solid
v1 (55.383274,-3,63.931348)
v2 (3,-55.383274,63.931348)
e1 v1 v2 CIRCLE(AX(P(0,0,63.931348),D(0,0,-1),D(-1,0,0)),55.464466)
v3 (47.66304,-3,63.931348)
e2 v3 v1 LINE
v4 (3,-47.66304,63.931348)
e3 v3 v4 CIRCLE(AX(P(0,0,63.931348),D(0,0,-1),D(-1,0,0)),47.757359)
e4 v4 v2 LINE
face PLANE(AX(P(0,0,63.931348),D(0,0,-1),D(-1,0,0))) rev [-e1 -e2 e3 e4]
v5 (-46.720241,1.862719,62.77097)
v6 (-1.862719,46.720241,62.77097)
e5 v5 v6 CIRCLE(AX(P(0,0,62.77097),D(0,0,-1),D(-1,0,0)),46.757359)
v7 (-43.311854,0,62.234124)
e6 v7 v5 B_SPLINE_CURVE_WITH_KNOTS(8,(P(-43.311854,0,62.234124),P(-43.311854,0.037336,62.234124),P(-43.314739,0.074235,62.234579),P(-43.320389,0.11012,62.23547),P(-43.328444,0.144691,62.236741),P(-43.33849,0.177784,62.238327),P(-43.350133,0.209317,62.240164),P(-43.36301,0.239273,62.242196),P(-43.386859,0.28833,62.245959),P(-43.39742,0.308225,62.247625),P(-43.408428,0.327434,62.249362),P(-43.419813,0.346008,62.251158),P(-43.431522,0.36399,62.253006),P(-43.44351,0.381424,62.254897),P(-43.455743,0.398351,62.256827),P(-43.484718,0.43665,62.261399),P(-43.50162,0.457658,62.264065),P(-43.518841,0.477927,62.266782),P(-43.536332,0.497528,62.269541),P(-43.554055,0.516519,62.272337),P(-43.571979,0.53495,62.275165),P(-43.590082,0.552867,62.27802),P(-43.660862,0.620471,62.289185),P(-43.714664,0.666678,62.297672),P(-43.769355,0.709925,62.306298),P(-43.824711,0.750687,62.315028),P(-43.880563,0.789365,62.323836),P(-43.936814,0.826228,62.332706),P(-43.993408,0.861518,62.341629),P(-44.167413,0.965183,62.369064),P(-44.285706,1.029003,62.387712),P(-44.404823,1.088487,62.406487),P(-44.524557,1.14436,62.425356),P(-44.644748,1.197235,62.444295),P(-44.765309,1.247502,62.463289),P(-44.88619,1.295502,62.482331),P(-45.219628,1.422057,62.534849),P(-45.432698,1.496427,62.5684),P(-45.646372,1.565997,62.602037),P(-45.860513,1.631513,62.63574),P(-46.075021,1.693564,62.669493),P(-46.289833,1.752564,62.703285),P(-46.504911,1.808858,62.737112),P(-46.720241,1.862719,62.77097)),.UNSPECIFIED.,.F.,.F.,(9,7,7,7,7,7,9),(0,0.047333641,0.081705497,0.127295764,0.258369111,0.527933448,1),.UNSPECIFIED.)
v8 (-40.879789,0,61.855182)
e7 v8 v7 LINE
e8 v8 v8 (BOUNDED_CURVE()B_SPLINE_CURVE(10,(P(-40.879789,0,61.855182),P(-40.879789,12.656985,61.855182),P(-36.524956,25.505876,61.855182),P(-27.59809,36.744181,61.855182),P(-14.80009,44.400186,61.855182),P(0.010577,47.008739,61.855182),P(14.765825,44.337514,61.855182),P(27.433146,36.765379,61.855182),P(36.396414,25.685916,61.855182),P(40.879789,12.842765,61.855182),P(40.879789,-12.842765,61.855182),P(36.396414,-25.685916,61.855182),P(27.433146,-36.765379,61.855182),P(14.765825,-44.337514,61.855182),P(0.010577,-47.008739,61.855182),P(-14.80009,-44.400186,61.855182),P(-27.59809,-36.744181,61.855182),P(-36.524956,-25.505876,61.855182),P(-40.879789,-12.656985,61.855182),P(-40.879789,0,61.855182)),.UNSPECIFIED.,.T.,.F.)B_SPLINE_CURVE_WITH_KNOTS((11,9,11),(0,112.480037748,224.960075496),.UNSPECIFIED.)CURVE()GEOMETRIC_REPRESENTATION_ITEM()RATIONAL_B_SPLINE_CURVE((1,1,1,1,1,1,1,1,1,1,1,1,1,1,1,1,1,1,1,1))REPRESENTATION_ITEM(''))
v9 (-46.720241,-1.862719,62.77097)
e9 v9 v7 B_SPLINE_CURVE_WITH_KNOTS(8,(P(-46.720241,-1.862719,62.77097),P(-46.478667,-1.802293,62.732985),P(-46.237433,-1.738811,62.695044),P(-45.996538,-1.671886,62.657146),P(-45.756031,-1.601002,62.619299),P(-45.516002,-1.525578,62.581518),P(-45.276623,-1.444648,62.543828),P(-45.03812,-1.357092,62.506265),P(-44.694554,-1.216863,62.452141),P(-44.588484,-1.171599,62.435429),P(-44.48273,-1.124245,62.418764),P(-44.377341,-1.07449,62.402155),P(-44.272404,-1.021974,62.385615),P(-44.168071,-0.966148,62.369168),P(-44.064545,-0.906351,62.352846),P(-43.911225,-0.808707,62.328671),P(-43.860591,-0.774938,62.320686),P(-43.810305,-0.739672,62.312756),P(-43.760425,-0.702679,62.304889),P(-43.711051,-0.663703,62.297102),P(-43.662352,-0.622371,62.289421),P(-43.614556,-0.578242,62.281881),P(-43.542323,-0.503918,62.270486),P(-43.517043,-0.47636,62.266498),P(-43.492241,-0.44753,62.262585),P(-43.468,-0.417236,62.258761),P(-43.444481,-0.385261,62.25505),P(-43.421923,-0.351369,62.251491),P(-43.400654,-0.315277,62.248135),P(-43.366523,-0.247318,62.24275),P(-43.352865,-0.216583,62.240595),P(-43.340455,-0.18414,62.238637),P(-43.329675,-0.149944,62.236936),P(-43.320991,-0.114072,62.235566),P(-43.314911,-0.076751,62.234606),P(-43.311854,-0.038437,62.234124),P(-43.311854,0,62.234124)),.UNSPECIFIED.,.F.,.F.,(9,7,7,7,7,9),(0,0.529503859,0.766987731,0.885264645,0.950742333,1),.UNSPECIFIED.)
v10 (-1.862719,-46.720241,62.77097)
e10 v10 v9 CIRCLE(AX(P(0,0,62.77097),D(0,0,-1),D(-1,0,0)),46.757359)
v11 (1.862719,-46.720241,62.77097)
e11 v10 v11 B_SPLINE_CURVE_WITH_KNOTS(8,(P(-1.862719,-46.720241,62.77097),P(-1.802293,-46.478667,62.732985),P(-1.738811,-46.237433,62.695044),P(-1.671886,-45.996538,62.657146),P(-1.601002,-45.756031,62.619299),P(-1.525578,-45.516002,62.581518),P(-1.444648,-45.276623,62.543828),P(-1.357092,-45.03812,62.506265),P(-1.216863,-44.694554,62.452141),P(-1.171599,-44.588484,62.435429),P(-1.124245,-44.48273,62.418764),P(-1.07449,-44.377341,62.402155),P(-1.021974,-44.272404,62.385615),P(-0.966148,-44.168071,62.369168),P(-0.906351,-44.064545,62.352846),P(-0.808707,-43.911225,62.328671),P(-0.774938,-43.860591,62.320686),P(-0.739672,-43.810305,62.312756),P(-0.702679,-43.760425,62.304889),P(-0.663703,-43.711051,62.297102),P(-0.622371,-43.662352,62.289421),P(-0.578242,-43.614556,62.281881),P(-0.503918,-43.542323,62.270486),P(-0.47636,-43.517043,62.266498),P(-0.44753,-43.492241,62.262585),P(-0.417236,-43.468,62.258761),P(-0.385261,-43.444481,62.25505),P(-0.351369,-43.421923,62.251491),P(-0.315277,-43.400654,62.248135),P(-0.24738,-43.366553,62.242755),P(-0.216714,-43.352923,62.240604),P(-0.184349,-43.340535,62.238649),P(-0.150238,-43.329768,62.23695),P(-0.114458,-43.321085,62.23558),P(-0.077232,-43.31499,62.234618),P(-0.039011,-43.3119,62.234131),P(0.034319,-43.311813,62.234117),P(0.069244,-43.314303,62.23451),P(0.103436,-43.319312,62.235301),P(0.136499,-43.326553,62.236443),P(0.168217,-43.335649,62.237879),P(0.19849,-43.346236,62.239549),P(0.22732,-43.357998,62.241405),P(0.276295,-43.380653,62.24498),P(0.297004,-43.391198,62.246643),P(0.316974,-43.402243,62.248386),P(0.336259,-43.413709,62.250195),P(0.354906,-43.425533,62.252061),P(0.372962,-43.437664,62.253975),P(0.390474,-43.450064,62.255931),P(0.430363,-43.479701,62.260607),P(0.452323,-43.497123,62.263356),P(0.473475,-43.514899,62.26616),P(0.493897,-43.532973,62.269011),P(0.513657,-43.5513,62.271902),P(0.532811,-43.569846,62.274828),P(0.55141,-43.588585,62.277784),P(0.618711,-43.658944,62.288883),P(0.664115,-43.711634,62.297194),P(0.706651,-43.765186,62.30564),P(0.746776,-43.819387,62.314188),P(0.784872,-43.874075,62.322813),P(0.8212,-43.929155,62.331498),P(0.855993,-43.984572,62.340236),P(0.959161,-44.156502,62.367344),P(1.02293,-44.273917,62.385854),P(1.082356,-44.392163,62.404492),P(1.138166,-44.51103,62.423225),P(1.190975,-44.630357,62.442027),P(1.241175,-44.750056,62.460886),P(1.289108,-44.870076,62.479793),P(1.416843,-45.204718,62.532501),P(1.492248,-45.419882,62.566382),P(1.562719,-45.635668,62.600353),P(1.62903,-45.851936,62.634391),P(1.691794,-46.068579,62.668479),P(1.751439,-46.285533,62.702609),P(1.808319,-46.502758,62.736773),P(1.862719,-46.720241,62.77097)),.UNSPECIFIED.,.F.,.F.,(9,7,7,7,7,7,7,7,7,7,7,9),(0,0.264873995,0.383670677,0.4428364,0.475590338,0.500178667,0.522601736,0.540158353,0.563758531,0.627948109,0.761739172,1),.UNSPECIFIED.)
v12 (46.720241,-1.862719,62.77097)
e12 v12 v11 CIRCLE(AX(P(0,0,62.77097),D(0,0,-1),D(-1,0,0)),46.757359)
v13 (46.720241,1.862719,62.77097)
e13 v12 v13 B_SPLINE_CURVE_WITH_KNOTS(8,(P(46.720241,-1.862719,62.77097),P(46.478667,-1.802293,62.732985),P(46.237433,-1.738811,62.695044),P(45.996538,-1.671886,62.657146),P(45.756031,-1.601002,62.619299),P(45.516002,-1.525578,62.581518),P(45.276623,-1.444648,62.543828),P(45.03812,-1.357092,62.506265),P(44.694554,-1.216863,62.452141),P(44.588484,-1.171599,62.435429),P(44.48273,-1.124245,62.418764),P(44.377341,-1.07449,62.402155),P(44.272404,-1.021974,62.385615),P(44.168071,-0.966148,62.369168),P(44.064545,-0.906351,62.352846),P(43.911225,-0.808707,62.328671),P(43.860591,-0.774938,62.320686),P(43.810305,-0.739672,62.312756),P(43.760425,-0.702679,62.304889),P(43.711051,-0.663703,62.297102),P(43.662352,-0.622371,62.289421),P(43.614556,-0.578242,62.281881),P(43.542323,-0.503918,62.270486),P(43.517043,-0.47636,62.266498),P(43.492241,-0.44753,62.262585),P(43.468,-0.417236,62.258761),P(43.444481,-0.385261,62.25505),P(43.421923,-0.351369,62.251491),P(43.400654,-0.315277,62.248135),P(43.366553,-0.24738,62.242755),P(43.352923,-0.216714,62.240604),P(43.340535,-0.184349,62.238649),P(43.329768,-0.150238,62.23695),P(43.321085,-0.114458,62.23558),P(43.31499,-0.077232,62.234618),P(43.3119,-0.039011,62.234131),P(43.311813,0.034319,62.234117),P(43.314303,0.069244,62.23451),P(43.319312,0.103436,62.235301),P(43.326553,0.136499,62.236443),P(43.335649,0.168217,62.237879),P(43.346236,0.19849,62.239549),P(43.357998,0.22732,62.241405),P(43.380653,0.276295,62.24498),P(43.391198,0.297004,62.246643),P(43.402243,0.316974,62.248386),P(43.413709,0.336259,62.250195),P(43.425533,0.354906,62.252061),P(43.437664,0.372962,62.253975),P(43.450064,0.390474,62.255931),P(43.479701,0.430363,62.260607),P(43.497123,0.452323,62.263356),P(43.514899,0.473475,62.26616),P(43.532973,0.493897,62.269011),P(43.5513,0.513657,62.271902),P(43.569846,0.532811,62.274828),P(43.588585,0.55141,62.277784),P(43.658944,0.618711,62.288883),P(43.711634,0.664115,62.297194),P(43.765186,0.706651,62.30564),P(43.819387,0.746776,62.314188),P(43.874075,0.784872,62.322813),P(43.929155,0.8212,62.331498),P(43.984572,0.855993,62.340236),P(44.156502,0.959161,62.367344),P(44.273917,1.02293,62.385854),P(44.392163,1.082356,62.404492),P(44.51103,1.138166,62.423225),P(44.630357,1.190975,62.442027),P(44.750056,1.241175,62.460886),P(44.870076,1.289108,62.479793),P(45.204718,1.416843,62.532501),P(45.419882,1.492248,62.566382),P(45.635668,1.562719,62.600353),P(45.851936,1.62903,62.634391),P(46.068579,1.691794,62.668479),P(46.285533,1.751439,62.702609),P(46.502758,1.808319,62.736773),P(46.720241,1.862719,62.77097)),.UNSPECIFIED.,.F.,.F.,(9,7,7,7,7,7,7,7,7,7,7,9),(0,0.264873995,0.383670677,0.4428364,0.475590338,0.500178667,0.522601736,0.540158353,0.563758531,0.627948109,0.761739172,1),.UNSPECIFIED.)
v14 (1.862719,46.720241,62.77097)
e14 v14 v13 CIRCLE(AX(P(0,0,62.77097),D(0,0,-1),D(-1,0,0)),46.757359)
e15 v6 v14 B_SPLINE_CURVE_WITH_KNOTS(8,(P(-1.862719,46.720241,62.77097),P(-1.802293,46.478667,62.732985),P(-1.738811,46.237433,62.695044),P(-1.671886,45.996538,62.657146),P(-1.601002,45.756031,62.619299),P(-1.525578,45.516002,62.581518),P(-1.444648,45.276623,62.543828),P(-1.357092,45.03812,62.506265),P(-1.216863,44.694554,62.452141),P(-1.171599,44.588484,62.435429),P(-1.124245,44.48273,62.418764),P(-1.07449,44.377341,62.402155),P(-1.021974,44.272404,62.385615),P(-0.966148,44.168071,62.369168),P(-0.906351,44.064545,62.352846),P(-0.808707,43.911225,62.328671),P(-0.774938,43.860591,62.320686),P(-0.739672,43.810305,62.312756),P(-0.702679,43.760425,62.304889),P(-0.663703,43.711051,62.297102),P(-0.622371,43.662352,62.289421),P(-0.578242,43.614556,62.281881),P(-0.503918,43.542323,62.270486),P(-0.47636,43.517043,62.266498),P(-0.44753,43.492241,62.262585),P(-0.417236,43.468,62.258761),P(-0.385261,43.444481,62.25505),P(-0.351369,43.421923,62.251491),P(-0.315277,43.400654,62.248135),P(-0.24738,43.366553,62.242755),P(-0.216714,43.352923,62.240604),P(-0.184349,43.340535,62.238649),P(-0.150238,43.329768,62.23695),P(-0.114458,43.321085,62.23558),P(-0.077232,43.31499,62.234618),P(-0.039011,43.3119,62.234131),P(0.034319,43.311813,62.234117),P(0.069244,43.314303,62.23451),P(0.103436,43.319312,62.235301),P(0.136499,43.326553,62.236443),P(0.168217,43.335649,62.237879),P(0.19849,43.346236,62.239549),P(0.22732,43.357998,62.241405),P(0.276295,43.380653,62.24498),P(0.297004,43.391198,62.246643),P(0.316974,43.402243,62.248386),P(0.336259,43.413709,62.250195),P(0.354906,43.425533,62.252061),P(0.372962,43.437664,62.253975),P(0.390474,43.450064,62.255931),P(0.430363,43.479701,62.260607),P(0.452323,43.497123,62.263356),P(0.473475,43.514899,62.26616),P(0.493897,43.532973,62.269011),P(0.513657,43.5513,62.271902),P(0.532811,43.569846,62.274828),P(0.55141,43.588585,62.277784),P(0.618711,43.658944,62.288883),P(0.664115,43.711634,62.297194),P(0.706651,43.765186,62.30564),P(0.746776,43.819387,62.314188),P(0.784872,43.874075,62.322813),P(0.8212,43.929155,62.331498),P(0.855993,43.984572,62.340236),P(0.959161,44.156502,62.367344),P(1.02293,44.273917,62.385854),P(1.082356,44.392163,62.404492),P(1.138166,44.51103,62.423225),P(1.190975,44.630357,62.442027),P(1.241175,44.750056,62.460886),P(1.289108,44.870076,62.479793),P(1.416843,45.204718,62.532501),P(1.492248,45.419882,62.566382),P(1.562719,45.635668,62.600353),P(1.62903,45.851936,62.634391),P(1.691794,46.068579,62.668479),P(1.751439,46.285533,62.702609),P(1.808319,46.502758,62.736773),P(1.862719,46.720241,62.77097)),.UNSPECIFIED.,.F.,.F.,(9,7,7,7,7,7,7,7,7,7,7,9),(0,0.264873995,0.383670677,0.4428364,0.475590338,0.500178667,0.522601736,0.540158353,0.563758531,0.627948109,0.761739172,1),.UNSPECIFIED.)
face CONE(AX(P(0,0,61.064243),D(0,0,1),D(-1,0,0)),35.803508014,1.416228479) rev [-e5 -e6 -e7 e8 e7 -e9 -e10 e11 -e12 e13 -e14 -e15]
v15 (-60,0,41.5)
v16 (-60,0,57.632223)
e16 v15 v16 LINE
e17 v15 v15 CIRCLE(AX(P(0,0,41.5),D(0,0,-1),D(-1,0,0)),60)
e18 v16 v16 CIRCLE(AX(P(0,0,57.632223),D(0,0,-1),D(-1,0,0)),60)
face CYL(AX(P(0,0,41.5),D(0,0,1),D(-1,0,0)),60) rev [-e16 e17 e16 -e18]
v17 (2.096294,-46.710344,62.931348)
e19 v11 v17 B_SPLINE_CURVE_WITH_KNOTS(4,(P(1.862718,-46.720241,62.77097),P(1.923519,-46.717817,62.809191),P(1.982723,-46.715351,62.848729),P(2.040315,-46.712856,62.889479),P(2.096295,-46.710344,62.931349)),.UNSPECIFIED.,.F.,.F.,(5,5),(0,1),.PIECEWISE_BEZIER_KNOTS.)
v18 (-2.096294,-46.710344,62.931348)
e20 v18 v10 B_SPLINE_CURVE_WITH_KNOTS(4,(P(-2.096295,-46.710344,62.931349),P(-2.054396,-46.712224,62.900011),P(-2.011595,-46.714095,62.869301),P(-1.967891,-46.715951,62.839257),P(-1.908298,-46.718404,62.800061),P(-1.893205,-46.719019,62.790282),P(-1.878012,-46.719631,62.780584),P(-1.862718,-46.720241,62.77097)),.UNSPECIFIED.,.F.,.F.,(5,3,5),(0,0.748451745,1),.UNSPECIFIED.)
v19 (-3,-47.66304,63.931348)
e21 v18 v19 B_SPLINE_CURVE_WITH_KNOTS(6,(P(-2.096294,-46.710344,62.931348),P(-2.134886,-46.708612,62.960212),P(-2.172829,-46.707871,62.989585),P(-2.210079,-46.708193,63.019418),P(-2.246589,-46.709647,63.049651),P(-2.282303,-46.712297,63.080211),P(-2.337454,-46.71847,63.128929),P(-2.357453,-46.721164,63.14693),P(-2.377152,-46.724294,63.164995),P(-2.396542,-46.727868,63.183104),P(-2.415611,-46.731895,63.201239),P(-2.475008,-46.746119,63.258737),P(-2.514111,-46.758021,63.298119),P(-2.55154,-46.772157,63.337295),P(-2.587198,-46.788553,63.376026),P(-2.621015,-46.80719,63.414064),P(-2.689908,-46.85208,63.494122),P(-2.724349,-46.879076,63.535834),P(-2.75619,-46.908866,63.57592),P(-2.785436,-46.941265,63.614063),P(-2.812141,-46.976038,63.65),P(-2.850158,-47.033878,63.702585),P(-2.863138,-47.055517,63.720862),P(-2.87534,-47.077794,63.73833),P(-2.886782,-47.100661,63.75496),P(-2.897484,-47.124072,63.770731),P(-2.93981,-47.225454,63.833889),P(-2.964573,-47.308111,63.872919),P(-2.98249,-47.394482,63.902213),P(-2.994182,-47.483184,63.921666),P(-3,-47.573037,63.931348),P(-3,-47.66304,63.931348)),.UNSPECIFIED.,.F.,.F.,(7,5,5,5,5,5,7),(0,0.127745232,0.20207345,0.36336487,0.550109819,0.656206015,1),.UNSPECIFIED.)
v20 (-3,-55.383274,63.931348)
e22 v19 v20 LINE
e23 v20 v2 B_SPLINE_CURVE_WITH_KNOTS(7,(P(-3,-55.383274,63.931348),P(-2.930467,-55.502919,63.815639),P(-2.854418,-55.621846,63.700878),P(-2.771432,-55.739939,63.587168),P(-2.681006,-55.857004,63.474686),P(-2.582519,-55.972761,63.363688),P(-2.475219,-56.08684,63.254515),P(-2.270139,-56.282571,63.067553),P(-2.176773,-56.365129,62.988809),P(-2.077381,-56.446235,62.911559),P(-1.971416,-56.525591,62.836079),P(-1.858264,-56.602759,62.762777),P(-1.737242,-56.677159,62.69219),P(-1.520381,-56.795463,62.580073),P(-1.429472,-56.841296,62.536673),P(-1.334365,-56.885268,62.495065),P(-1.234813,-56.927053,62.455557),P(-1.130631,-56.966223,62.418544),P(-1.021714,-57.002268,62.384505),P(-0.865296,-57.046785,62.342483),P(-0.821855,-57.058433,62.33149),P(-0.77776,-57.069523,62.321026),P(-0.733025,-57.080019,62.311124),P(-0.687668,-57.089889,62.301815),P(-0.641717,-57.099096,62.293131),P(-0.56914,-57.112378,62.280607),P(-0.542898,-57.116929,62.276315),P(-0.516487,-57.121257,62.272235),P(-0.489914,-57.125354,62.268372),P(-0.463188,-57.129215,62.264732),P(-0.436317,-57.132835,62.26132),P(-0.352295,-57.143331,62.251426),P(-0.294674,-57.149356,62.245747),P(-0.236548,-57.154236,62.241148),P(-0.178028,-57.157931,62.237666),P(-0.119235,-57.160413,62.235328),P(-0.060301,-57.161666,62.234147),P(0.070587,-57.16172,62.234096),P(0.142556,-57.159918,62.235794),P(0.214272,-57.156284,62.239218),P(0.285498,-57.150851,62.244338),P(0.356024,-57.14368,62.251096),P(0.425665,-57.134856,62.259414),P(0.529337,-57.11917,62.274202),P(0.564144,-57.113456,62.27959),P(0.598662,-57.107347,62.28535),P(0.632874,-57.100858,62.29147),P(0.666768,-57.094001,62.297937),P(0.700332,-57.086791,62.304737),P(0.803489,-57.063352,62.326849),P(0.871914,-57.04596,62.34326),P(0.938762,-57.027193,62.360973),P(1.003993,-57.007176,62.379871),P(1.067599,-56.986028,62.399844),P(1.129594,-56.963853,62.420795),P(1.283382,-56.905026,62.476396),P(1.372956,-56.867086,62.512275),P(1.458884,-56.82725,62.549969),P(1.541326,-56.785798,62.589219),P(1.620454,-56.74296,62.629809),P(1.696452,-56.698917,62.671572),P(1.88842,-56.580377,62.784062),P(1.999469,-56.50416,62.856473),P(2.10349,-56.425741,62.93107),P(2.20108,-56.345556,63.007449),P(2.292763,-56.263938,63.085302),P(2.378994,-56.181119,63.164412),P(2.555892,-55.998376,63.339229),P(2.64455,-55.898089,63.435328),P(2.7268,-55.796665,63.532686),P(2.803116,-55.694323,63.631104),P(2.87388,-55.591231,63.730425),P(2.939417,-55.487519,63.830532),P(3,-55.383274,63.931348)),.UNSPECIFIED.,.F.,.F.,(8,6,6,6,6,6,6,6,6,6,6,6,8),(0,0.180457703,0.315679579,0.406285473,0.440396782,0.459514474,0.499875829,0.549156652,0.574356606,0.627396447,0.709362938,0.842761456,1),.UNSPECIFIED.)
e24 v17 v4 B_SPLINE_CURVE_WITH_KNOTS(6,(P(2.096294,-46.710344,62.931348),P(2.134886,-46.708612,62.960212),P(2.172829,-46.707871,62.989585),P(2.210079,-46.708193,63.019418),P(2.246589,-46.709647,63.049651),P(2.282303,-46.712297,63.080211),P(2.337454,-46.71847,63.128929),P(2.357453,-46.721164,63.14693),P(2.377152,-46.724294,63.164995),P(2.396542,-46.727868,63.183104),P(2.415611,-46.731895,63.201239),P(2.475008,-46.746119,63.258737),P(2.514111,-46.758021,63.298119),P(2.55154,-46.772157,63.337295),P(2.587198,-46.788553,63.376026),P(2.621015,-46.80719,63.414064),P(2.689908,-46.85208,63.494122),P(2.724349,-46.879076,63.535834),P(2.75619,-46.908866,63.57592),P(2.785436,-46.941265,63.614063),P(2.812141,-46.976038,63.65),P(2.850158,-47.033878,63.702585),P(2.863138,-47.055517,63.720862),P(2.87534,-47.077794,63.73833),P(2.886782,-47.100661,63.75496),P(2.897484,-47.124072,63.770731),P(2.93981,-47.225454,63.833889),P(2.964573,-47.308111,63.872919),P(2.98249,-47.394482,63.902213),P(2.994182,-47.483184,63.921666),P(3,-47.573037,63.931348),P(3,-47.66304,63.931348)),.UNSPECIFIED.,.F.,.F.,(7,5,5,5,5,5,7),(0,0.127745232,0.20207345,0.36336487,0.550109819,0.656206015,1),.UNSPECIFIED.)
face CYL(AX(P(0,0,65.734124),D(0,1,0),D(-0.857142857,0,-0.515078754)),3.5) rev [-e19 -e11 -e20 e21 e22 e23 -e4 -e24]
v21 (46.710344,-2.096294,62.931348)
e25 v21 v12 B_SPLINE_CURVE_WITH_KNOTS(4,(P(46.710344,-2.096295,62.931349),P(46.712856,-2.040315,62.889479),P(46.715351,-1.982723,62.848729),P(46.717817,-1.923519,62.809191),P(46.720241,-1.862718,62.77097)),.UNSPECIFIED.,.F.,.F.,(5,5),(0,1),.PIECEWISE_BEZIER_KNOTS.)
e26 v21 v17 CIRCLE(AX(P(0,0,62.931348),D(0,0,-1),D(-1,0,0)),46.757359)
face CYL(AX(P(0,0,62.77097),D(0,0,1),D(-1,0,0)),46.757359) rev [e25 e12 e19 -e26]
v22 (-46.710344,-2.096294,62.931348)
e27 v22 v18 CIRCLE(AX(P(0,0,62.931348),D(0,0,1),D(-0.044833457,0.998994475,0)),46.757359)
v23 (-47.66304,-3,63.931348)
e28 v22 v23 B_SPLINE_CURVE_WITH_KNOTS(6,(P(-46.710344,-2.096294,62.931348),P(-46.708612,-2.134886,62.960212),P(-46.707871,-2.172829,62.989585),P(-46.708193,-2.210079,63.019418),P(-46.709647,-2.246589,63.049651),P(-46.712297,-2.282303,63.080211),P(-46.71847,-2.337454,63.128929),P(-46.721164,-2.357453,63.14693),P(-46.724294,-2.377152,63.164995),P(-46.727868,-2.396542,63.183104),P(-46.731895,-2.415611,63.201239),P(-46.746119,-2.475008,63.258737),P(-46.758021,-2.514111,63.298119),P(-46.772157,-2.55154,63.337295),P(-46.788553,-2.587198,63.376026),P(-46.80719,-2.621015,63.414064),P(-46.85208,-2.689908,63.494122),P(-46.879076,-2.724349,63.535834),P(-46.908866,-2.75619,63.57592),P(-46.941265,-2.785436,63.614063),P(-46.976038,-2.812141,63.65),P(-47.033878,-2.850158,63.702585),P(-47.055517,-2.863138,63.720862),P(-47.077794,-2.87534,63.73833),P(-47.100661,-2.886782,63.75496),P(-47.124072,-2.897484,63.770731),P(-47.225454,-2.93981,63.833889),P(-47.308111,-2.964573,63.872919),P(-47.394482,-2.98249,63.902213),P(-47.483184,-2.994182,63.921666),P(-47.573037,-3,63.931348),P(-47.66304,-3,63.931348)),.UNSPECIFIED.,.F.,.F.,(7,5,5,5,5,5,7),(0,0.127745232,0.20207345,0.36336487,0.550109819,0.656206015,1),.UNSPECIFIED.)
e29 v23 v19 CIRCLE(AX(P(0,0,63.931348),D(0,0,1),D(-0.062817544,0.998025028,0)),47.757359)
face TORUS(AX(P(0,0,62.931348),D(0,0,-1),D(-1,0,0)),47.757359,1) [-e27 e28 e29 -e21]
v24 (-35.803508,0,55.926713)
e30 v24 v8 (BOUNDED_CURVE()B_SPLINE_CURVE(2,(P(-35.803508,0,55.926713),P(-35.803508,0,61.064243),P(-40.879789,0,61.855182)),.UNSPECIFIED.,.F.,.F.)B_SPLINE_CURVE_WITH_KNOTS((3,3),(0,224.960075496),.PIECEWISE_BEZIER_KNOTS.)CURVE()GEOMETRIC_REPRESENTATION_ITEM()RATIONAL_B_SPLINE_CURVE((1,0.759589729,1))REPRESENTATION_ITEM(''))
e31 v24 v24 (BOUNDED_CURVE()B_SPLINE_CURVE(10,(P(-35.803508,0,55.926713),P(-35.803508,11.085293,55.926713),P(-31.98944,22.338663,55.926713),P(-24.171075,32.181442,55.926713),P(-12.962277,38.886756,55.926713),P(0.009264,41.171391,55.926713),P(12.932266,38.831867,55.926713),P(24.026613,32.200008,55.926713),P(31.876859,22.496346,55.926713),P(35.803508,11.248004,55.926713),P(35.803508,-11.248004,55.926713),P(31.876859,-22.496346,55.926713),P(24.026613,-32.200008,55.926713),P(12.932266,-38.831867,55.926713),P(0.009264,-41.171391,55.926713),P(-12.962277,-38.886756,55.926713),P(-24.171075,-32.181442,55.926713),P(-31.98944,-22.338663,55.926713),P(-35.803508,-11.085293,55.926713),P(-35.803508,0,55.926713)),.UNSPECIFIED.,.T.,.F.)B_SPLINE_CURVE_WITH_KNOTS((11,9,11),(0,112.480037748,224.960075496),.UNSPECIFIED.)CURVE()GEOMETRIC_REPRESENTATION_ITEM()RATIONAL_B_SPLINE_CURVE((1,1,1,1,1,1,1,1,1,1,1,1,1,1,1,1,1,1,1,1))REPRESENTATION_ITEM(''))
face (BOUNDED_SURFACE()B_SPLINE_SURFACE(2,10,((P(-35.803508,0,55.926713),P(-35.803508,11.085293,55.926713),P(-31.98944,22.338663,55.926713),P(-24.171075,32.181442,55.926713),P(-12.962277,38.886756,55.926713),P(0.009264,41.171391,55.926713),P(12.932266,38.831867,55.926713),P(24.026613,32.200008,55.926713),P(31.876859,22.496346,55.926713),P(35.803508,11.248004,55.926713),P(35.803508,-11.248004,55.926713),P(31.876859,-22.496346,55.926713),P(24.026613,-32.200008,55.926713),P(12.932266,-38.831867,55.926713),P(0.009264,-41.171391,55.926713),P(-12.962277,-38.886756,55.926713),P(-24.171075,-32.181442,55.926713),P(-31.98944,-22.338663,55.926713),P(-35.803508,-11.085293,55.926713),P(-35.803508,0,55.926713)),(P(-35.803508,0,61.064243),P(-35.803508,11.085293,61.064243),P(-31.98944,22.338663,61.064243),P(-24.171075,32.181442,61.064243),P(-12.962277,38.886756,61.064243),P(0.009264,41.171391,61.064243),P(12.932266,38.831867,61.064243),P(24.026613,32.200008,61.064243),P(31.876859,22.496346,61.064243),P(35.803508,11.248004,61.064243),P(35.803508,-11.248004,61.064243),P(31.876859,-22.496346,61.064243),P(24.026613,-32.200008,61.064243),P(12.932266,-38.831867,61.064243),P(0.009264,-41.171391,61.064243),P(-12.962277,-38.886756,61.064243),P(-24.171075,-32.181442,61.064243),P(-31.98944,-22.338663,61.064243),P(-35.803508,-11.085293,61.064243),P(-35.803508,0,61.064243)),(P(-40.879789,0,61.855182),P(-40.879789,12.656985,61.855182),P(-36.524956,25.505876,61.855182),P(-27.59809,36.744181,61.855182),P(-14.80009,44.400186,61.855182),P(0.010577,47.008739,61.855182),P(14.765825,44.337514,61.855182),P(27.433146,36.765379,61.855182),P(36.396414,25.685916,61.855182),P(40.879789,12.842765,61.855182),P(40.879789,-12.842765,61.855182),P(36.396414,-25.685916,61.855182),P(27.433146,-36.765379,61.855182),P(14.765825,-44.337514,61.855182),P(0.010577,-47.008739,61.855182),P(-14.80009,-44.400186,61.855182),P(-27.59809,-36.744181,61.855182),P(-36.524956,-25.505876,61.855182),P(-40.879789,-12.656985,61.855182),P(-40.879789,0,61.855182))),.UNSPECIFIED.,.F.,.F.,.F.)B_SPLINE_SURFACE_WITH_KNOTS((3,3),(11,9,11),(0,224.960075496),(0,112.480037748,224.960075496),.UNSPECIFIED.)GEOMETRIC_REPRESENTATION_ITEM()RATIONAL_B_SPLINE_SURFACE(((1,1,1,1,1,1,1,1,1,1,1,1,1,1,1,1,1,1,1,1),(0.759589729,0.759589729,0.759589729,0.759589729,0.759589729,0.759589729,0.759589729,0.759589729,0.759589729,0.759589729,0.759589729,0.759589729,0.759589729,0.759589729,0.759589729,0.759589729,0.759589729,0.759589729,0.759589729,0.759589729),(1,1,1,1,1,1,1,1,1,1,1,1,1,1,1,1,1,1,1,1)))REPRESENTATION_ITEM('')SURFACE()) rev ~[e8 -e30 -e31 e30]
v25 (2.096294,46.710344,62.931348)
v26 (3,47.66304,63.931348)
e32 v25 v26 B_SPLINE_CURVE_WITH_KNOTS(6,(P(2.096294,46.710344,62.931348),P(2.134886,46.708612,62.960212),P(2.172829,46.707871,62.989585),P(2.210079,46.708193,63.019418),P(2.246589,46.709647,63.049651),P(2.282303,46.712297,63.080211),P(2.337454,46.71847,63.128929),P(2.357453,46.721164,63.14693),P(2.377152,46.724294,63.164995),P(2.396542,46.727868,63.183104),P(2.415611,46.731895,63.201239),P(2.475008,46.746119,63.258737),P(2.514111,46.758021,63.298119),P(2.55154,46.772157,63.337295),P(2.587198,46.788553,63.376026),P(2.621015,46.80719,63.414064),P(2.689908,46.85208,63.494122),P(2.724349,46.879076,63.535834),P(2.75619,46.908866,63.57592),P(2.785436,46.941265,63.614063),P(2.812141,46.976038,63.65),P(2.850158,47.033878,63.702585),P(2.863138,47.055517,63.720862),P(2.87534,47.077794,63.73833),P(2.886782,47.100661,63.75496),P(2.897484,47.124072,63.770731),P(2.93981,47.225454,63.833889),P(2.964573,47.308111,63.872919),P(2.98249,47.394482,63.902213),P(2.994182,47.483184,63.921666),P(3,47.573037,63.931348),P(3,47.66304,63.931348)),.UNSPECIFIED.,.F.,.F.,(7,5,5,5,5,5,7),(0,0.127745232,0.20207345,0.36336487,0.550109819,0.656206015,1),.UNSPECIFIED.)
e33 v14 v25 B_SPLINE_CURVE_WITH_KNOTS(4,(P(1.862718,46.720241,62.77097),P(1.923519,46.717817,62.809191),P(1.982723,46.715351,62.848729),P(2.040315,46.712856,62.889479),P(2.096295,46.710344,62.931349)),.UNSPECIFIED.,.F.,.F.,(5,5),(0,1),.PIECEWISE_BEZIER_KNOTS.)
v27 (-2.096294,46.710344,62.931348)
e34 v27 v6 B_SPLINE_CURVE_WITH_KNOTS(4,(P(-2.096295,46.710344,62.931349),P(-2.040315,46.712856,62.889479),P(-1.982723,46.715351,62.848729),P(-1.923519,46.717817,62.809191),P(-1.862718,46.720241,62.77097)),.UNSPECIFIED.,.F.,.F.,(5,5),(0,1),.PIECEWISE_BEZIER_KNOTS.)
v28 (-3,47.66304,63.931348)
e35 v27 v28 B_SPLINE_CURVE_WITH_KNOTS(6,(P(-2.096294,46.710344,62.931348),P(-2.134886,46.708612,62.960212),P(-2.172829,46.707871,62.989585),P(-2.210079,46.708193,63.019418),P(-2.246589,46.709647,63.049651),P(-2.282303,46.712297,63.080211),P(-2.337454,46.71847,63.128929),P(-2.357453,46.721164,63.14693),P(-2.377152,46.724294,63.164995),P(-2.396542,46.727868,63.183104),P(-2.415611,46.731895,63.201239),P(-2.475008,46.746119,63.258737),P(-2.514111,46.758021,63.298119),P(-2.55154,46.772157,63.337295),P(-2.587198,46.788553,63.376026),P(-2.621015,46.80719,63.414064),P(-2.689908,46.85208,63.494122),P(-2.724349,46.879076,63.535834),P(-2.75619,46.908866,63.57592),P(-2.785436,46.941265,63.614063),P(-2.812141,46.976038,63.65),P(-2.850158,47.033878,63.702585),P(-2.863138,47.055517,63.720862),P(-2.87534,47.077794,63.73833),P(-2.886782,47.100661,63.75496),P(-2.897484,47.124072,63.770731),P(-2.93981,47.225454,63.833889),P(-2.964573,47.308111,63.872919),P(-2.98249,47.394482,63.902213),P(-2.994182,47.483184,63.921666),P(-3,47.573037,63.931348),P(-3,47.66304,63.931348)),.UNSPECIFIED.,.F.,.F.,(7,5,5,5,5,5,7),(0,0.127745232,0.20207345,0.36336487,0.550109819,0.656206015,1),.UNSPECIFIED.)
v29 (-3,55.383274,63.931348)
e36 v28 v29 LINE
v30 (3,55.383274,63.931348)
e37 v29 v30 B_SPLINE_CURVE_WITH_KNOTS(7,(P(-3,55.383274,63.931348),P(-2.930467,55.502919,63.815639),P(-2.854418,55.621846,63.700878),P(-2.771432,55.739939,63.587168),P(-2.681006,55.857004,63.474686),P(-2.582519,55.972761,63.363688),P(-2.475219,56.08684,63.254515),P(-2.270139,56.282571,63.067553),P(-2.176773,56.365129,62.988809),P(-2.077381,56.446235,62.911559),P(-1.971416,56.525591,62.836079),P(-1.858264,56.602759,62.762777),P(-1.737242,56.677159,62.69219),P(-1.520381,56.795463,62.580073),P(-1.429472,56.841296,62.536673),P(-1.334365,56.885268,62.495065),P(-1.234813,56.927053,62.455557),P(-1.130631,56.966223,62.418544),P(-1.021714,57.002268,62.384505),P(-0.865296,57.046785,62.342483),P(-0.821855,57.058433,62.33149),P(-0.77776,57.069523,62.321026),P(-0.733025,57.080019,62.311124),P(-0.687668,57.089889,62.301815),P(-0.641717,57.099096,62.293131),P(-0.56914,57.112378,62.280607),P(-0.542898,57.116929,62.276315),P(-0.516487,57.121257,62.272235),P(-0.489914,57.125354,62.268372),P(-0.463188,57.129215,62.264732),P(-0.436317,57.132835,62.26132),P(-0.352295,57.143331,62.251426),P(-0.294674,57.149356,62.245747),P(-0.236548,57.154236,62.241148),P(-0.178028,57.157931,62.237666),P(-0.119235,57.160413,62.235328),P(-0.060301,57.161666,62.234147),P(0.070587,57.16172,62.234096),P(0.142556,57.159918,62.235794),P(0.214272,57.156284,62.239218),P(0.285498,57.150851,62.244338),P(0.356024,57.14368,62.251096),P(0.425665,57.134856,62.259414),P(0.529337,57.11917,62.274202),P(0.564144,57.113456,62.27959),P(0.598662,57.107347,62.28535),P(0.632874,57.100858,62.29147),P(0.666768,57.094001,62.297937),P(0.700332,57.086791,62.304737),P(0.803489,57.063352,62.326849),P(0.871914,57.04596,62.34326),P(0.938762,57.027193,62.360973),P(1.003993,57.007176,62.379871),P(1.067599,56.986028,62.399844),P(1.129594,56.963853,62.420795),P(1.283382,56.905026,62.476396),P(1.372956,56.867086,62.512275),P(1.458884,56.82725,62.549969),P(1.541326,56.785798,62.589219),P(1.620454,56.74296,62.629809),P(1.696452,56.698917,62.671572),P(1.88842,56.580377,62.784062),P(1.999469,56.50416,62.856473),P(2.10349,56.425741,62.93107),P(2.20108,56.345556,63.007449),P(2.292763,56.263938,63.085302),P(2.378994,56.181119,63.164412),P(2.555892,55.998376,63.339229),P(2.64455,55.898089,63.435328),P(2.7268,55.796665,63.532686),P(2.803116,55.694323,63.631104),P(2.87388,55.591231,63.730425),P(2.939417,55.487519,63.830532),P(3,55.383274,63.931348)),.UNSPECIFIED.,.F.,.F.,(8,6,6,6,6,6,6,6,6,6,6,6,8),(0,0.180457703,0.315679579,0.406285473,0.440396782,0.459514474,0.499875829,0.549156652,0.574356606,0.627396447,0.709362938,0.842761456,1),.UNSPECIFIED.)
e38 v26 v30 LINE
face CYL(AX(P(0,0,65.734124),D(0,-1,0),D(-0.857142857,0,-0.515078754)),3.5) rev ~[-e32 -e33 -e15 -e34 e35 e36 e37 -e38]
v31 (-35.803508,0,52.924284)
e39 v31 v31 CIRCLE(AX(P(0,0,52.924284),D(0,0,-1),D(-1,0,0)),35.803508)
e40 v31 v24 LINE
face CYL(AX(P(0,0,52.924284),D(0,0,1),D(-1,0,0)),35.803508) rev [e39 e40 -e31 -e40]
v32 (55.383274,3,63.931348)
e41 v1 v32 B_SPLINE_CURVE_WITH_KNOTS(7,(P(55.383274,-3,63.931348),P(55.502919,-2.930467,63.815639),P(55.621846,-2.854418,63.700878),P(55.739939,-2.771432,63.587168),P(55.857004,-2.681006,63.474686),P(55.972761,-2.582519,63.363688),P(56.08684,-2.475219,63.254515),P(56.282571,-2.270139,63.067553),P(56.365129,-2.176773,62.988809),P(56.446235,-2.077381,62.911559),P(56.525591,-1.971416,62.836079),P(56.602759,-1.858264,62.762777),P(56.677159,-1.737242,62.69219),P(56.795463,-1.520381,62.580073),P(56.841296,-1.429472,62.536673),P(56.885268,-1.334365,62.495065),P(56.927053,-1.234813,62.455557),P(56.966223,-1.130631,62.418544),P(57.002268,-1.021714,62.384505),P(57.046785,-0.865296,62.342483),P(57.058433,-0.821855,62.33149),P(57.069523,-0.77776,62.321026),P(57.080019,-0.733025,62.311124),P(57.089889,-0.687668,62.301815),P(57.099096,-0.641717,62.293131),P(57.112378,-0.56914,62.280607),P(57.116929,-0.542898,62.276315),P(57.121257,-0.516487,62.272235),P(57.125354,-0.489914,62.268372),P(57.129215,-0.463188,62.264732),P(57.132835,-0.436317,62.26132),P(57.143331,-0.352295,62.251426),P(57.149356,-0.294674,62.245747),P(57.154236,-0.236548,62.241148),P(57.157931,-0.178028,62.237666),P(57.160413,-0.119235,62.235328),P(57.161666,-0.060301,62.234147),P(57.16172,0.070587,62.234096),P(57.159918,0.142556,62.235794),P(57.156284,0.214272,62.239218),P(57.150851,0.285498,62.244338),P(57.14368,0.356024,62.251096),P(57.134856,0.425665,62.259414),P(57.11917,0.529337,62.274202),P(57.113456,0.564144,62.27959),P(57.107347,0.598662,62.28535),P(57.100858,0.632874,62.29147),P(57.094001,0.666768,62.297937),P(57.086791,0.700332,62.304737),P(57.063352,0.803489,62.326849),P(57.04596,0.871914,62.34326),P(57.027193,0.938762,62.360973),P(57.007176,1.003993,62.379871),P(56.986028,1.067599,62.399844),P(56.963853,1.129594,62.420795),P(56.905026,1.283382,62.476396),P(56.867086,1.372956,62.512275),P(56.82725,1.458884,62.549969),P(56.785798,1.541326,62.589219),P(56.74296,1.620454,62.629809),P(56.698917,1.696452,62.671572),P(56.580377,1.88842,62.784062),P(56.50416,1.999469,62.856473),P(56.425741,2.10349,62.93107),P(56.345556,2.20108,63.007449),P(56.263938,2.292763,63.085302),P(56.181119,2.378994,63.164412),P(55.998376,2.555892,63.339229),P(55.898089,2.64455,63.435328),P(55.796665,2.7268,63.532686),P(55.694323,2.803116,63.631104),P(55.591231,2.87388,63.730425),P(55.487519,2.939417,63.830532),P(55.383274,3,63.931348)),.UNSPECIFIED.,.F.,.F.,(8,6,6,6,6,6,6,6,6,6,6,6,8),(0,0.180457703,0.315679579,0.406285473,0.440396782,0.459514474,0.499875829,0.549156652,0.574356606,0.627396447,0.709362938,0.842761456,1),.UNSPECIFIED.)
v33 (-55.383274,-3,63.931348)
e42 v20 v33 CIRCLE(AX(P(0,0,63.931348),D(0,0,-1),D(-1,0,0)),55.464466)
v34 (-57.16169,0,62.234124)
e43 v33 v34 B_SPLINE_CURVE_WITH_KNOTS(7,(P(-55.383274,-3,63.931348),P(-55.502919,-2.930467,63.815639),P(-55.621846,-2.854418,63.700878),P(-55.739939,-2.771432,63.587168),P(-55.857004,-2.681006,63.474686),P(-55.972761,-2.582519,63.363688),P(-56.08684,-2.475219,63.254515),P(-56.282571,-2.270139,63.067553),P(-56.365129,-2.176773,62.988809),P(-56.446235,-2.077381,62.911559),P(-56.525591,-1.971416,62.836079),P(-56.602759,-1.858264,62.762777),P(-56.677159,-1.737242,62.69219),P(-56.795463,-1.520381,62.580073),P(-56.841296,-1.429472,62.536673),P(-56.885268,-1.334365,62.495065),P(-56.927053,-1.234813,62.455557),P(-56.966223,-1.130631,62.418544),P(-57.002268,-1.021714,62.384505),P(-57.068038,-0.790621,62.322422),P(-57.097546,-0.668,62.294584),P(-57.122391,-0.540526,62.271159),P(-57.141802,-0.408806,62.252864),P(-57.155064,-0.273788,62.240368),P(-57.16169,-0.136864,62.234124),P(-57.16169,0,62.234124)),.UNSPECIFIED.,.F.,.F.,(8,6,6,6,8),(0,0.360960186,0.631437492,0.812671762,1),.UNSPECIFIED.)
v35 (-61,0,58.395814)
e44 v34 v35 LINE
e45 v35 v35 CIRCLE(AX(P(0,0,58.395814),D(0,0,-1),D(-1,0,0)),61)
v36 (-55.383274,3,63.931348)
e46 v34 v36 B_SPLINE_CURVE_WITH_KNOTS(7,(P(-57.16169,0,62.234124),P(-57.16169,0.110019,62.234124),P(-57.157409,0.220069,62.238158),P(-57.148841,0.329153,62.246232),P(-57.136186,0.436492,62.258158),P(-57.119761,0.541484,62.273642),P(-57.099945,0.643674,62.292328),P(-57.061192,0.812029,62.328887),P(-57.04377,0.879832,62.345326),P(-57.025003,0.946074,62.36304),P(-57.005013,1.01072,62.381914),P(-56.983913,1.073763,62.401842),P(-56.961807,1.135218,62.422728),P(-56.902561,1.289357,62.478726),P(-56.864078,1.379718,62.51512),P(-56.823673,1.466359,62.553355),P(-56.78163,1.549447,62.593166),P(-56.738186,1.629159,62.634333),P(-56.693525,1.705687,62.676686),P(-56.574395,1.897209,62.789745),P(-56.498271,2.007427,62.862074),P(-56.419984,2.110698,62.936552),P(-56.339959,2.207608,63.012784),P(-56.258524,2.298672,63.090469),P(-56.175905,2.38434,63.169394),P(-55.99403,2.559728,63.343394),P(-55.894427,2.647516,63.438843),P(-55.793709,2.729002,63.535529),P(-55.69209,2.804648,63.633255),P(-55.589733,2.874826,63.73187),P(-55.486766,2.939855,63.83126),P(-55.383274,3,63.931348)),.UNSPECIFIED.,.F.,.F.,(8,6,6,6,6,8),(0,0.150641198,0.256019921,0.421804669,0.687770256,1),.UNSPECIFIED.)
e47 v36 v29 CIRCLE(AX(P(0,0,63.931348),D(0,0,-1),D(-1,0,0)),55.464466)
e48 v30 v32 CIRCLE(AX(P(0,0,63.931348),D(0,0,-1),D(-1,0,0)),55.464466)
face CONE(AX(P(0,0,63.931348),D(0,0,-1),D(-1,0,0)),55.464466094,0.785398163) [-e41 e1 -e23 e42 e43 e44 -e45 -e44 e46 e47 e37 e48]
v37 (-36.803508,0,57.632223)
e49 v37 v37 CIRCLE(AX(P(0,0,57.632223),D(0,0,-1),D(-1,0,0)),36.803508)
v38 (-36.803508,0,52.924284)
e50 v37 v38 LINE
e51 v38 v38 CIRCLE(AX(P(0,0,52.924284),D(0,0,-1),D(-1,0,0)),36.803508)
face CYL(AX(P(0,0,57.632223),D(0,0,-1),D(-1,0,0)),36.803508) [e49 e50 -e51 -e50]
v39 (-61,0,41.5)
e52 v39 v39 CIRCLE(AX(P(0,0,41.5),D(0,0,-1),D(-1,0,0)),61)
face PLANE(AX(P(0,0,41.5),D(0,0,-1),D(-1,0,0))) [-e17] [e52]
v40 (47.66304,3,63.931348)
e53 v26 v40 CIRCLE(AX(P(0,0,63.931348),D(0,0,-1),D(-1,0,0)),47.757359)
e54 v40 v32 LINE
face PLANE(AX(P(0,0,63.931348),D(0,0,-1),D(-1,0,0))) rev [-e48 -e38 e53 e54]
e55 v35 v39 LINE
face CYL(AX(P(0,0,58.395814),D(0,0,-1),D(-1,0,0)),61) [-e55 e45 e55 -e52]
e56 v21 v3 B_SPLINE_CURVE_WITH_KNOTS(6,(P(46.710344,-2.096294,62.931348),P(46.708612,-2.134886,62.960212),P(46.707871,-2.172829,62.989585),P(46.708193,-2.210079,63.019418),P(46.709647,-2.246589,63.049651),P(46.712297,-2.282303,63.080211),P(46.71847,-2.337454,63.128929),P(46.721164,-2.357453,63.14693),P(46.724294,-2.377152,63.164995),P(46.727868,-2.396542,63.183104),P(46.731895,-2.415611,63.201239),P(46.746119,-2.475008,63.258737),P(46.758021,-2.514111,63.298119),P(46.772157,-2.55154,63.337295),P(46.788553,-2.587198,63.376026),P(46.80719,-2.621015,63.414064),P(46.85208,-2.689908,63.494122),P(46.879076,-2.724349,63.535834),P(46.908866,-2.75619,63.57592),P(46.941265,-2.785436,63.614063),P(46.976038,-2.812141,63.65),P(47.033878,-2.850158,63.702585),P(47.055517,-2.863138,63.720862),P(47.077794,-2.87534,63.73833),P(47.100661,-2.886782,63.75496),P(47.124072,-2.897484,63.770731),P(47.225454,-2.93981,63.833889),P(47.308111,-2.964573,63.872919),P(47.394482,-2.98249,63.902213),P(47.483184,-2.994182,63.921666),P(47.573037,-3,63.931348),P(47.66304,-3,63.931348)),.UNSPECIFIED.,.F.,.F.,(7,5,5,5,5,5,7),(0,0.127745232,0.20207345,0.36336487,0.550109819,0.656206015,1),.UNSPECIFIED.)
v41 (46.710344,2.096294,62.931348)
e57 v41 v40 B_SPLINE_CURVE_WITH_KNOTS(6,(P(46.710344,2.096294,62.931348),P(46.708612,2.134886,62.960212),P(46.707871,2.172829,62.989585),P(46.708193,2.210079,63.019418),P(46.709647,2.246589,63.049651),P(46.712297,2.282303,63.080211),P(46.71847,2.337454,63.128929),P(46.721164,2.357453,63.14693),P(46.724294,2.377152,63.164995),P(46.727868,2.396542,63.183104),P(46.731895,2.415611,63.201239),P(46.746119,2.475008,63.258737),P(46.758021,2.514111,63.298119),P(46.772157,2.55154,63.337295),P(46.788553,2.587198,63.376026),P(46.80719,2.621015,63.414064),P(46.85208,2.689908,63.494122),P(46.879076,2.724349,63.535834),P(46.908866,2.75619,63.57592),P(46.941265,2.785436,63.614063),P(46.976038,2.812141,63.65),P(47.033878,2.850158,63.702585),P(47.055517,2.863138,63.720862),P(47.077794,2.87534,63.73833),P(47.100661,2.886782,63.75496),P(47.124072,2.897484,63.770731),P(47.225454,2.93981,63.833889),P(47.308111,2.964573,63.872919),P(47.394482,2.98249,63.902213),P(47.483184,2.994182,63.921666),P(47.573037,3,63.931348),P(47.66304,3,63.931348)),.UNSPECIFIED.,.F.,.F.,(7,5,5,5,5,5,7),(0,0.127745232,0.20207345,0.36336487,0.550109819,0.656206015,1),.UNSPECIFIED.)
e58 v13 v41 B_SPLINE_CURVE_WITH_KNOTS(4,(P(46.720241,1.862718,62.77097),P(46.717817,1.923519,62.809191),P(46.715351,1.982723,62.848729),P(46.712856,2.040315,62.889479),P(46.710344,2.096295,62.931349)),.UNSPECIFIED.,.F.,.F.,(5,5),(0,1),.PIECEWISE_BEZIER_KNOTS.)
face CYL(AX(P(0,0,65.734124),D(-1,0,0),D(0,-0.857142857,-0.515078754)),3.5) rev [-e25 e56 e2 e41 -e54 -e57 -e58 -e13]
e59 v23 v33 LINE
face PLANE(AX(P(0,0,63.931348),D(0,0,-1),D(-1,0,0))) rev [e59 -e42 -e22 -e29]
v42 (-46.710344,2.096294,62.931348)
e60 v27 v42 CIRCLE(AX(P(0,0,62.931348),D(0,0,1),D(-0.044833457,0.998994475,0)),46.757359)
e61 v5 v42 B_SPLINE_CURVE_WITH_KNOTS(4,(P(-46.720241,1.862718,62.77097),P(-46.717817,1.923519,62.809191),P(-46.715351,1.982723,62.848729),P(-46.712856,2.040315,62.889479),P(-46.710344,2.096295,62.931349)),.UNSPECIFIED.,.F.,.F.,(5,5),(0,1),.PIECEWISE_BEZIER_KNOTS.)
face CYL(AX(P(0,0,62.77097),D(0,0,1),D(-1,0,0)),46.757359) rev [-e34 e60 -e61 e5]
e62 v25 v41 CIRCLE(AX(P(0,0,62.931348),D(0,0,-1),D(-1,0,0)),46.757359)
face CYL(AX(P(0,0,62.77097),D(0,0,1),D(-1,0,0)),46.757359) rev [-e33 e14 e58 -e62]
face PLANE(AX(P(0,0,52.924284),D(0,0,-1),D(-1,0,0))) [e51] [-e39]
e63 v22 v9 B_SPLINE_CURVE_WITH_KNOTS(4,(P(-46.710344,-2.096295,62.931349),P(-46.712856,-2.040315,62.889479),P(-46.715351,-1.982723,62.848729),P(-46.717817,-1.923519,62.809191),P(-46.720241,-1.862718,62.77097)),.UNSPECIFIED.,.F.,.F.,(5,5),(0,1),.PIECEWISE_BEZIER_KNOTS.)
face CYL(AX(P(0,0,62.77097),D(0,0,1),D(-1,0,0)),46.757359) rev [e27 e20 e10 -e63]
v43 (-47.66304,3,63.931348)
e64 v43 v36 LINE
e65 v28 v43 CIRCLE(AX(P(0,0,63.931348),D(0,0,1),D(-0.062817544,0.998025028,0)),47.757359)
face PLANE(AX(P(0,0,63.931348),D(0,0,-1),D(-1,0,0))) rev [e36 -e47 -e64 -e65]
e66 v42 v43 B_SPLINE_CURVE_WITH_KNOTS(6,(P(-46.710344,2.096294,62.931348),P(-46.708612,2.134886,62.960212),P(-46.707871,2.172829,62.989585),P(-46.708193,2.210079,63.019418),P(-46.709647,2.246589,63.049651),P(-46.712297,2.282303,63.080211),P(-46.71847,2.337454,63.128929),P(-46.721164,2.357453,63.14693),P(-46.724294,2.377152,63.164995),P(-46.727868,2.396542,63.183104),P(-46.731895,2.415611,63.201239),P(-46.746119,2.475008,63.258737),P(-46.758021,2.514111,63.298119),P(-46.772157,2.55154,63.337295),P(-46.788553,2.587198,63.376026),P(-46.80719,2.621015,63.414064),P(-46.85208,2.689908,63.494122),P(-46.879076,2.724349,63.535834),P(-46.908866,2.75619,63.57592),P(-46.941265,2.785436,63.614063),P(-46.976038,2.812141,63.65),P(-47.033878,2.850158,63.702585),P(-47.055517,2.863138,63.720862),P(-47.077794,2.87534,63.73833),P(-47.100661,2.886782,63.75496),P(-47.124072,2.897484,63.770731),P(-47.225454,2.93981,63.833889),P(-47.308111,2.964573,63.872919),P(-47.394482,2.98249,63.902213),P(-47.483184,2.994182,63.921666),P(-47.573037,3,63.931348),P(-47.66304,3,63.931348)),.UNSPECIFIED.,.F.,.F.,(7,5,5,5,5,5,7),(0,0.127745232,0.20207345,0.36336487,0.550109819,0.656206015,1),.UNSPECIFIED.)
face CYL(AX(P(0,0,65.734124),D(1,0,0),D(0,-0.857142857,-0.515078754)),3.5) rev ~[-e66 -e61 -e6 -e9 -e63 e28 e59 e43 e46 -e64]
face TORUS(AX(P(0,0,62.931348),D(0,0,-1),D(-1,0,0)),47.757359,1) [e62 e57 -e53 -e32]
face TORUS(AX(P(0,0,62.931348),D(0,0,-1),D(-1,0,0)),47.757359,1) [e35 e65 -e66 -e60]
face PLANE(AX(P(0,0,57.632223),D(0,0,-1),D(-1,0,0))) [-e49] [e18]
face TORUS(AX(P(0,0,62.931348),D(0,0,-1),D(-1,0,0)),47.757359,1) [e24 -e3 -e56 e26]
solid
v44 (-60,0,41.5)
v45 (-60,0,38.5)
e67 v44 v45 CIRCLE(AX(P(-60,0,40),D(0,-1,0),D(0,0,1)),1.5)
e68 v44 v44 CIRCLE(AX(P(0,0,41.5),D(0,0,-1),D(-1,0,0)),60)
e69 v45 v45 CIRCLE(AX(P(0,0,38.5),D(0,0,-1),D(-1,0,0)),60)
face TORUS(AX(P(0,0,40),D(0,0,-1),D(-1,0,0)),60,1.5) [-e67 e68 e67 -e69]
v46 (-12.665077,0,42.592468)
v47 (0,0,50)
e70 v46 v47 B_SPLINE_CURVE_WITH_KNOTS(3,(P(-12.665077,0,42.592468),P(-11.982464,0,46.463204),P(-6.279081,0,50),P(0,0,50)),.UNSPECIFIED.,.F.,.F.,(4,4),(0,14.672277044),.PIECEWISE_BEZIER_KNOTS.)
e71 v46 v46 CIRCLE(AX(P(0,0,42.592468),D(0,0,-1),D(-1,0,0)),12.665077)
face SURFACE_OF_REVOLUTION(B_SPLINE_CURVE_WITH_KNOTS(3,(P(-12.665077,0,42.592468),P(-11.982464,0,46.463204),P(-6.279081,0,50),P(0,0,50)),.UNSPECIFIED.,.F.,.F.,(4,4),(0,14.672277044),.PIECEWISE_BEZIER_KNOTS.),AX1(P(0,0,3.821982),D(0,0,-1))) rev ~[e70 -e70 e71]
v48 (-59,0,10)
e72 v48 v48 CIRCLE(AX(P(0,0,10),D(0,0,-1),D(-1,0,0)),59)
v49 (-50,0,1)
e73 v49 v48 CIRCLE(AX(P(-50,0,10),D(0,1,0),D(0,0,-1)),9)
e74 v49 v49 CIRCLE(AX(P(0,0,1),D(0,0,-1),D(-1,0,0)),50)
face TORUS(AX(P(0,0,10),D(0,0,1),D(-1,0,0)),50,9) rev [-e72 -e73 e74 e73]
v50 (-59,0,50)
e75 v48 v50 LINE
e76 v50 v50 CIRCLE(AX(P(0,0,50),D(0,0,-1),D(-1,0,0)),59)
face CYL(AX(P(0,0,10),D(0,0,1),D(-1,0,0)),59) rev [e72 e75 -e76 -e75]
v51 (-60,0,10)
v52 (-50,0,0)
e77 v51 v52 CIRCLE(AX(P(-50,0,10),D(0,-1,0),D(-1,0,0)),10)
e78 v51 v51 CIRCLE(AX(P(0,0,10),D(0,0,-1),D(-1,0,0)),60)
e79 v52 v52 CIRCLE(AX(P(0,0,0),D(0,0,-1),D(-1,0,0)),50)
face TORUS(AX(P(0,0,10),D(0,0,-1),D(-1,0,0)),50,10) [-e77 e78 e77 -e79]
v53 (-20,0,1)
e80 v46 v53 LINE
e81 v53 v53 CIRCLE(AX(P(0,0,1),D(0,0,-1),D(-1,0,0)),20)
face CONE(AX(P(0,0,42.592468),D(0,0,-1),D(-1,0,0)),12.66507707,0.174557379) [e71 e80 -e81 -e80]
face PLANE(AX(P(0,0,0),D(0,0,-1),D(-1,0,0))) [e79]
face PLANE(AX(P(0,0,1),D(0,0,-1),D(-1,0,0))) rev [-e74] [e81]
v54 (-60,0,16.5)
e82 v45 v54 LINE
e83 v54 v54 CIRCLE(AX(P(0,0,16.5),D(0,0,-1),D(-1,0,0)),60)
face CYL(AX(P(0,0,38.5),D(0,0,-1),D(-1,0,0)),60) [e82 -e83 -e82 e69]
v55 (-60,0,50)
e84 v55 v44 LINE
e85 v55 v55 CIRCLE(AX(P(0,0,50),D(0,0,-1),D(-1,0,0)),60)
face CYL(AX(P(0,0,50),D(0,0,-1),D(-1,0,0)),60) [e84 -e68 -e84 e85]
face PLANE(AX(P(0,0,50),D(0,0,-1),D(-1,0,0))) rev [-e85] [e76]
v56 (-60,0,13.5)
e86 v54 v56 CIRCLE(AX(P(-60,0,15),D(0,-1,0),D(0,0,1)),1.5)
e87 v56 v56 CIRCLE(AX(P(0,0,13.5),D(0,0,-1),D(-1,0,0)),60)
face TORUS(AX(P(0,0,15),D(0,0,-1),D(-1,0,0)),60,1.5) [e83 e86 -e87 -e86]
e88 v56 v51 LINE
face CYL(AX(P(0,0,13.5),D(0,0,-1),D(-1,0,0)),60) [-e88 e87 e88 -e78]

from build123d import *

# Parameters (mm, degrees)
F5_R          = 6
F6_R          = 1
F7_DEPTH      = 61.5010001
F7_DEPTH_BACK = 61.5010001
F9_DEPTH      = 61.5010001
F9_DEPTH_BACK = 61.5010001


# Not quite as in the source:
# - a feature names something its author has since deleted; it is built from what else it names


with BuildPart() as f1:
    # F0 (on Front) → F1 (revolve)
    with BuildSketch(Plane.XZ):
        with BuildLine():
            add(Edge.make_bspline(
                [(-12.6650770704, 42.5924675862), (-11.9824642458, 46.4632037959), (-6.2790805461, 50), (0, 50)],
                knots=[0, 0, 0, 0, 14.6722770441, 14.6722770441, 14.6722770441, 14.6722770441], degree=3))
            Line((-12.6650770704, 42.5924675862), (-20, 1))
            Line((-20, 1), (-50, 1))
            ThreePointArc((-50, 1), (-56.3639610307, 3.6360389693), (-59, 10))
            Line((-59, 10), (-59, 50))
            Line((-59, 50), (-60, 50))
            Line((-60, 50), (-60, 41.5))
            ThreePointArc((-60, 41.5), (-61.5, 40), (-60, 38.5))
            Line((-60, 38.5), (-60, 16.5))
            ThreePointArc((-60, 16.5), (-61.5, 15), (-60, 13.5))
            Line((-60, 13.5), (-60, 10))
            ThreePointArc((-60, 10), (-57.0710678119, 2.9289321881), (-50, 0))
            Line((-50, 0), (0, 0))
            Line((0, 0), (0, 50))
        make_face()
    revolve(axis=Axis((0, 0, 3.8219820102), (0, 0, -1)))


with BuildPart() as f3:
    # F2 (on Front) → F3 (revolve)
    with BuildSketch(Plane.XZ):
        Polygon((-61, 41.5), (-60, 41.5), (-60, 57.6322230848), (-36.8035080135, 57.6322230848), (-36.8035080135, 52.9242841807), (-35.8035080135, 52.9242841807), (-35.8035080135, 61.0642433167), (-46.7573593129, 62.7709701657), (-46.7573593129, 63.9313480565), (-55.4644660941, 63.9313480565), (-61, 58.3958141506), align=None)
    revolve(axis=Axis((0, 0, 92.2469310462), (0, 0, -1)))

    # F5
    f5_edges = [f3.edges().sort_by_distance(p)[0] for p in [
        (35.803508, 0, 61.064243),
    ]]
    fillet(f5_edges, radius=F5_R)

    # F6
    f6_edges = [f3.edges().sort_by_distance(p)[0] for p in [
        (46.757359, 0, 63.931348),
    ]]
    fillet(f6_edges, radius=F6_R)

    # F4 (on Front) → F7 (cut, two sides)
    with BuildSketch(Plane.XZ) as f7_sk:
        with BuildLine():
            Line((3, 63.9313480565), (-3, 63.9313480565))
            ThreePointArc((-3, 63.9313480565), (0, 62.2341236942), (3, 63.9313480565))
        make_face()
    extrude(amount=-F7_DEPTH, mode=Mode.SUBTRACT)
    extrude(f7_sk.sketch, amount=F7_DEPTH_BACK, mode=Mode.SUBTRACT)

    # F8 (on Right) → F9 (cut, two sides)
    with BuildSketch(Plane.YZ) as f9_sk:
        with BuildLine():
            ThreePointArc((-3, 63.9313480565), (0, 62.2341236942), (3, 63.9313480565))
            Line((3, 63.9313480565), (-3, 63.9313480565))
        make_face()
    extrude(amount=F9_DEPTH, mode=Mode.SUBTRACT)
    extrude(f9_sk.sketch, amount=-F9_DEPTH_BACK, mode=Mode.SUBTRACT)


solid = Compound([f1.part, f3.part])
